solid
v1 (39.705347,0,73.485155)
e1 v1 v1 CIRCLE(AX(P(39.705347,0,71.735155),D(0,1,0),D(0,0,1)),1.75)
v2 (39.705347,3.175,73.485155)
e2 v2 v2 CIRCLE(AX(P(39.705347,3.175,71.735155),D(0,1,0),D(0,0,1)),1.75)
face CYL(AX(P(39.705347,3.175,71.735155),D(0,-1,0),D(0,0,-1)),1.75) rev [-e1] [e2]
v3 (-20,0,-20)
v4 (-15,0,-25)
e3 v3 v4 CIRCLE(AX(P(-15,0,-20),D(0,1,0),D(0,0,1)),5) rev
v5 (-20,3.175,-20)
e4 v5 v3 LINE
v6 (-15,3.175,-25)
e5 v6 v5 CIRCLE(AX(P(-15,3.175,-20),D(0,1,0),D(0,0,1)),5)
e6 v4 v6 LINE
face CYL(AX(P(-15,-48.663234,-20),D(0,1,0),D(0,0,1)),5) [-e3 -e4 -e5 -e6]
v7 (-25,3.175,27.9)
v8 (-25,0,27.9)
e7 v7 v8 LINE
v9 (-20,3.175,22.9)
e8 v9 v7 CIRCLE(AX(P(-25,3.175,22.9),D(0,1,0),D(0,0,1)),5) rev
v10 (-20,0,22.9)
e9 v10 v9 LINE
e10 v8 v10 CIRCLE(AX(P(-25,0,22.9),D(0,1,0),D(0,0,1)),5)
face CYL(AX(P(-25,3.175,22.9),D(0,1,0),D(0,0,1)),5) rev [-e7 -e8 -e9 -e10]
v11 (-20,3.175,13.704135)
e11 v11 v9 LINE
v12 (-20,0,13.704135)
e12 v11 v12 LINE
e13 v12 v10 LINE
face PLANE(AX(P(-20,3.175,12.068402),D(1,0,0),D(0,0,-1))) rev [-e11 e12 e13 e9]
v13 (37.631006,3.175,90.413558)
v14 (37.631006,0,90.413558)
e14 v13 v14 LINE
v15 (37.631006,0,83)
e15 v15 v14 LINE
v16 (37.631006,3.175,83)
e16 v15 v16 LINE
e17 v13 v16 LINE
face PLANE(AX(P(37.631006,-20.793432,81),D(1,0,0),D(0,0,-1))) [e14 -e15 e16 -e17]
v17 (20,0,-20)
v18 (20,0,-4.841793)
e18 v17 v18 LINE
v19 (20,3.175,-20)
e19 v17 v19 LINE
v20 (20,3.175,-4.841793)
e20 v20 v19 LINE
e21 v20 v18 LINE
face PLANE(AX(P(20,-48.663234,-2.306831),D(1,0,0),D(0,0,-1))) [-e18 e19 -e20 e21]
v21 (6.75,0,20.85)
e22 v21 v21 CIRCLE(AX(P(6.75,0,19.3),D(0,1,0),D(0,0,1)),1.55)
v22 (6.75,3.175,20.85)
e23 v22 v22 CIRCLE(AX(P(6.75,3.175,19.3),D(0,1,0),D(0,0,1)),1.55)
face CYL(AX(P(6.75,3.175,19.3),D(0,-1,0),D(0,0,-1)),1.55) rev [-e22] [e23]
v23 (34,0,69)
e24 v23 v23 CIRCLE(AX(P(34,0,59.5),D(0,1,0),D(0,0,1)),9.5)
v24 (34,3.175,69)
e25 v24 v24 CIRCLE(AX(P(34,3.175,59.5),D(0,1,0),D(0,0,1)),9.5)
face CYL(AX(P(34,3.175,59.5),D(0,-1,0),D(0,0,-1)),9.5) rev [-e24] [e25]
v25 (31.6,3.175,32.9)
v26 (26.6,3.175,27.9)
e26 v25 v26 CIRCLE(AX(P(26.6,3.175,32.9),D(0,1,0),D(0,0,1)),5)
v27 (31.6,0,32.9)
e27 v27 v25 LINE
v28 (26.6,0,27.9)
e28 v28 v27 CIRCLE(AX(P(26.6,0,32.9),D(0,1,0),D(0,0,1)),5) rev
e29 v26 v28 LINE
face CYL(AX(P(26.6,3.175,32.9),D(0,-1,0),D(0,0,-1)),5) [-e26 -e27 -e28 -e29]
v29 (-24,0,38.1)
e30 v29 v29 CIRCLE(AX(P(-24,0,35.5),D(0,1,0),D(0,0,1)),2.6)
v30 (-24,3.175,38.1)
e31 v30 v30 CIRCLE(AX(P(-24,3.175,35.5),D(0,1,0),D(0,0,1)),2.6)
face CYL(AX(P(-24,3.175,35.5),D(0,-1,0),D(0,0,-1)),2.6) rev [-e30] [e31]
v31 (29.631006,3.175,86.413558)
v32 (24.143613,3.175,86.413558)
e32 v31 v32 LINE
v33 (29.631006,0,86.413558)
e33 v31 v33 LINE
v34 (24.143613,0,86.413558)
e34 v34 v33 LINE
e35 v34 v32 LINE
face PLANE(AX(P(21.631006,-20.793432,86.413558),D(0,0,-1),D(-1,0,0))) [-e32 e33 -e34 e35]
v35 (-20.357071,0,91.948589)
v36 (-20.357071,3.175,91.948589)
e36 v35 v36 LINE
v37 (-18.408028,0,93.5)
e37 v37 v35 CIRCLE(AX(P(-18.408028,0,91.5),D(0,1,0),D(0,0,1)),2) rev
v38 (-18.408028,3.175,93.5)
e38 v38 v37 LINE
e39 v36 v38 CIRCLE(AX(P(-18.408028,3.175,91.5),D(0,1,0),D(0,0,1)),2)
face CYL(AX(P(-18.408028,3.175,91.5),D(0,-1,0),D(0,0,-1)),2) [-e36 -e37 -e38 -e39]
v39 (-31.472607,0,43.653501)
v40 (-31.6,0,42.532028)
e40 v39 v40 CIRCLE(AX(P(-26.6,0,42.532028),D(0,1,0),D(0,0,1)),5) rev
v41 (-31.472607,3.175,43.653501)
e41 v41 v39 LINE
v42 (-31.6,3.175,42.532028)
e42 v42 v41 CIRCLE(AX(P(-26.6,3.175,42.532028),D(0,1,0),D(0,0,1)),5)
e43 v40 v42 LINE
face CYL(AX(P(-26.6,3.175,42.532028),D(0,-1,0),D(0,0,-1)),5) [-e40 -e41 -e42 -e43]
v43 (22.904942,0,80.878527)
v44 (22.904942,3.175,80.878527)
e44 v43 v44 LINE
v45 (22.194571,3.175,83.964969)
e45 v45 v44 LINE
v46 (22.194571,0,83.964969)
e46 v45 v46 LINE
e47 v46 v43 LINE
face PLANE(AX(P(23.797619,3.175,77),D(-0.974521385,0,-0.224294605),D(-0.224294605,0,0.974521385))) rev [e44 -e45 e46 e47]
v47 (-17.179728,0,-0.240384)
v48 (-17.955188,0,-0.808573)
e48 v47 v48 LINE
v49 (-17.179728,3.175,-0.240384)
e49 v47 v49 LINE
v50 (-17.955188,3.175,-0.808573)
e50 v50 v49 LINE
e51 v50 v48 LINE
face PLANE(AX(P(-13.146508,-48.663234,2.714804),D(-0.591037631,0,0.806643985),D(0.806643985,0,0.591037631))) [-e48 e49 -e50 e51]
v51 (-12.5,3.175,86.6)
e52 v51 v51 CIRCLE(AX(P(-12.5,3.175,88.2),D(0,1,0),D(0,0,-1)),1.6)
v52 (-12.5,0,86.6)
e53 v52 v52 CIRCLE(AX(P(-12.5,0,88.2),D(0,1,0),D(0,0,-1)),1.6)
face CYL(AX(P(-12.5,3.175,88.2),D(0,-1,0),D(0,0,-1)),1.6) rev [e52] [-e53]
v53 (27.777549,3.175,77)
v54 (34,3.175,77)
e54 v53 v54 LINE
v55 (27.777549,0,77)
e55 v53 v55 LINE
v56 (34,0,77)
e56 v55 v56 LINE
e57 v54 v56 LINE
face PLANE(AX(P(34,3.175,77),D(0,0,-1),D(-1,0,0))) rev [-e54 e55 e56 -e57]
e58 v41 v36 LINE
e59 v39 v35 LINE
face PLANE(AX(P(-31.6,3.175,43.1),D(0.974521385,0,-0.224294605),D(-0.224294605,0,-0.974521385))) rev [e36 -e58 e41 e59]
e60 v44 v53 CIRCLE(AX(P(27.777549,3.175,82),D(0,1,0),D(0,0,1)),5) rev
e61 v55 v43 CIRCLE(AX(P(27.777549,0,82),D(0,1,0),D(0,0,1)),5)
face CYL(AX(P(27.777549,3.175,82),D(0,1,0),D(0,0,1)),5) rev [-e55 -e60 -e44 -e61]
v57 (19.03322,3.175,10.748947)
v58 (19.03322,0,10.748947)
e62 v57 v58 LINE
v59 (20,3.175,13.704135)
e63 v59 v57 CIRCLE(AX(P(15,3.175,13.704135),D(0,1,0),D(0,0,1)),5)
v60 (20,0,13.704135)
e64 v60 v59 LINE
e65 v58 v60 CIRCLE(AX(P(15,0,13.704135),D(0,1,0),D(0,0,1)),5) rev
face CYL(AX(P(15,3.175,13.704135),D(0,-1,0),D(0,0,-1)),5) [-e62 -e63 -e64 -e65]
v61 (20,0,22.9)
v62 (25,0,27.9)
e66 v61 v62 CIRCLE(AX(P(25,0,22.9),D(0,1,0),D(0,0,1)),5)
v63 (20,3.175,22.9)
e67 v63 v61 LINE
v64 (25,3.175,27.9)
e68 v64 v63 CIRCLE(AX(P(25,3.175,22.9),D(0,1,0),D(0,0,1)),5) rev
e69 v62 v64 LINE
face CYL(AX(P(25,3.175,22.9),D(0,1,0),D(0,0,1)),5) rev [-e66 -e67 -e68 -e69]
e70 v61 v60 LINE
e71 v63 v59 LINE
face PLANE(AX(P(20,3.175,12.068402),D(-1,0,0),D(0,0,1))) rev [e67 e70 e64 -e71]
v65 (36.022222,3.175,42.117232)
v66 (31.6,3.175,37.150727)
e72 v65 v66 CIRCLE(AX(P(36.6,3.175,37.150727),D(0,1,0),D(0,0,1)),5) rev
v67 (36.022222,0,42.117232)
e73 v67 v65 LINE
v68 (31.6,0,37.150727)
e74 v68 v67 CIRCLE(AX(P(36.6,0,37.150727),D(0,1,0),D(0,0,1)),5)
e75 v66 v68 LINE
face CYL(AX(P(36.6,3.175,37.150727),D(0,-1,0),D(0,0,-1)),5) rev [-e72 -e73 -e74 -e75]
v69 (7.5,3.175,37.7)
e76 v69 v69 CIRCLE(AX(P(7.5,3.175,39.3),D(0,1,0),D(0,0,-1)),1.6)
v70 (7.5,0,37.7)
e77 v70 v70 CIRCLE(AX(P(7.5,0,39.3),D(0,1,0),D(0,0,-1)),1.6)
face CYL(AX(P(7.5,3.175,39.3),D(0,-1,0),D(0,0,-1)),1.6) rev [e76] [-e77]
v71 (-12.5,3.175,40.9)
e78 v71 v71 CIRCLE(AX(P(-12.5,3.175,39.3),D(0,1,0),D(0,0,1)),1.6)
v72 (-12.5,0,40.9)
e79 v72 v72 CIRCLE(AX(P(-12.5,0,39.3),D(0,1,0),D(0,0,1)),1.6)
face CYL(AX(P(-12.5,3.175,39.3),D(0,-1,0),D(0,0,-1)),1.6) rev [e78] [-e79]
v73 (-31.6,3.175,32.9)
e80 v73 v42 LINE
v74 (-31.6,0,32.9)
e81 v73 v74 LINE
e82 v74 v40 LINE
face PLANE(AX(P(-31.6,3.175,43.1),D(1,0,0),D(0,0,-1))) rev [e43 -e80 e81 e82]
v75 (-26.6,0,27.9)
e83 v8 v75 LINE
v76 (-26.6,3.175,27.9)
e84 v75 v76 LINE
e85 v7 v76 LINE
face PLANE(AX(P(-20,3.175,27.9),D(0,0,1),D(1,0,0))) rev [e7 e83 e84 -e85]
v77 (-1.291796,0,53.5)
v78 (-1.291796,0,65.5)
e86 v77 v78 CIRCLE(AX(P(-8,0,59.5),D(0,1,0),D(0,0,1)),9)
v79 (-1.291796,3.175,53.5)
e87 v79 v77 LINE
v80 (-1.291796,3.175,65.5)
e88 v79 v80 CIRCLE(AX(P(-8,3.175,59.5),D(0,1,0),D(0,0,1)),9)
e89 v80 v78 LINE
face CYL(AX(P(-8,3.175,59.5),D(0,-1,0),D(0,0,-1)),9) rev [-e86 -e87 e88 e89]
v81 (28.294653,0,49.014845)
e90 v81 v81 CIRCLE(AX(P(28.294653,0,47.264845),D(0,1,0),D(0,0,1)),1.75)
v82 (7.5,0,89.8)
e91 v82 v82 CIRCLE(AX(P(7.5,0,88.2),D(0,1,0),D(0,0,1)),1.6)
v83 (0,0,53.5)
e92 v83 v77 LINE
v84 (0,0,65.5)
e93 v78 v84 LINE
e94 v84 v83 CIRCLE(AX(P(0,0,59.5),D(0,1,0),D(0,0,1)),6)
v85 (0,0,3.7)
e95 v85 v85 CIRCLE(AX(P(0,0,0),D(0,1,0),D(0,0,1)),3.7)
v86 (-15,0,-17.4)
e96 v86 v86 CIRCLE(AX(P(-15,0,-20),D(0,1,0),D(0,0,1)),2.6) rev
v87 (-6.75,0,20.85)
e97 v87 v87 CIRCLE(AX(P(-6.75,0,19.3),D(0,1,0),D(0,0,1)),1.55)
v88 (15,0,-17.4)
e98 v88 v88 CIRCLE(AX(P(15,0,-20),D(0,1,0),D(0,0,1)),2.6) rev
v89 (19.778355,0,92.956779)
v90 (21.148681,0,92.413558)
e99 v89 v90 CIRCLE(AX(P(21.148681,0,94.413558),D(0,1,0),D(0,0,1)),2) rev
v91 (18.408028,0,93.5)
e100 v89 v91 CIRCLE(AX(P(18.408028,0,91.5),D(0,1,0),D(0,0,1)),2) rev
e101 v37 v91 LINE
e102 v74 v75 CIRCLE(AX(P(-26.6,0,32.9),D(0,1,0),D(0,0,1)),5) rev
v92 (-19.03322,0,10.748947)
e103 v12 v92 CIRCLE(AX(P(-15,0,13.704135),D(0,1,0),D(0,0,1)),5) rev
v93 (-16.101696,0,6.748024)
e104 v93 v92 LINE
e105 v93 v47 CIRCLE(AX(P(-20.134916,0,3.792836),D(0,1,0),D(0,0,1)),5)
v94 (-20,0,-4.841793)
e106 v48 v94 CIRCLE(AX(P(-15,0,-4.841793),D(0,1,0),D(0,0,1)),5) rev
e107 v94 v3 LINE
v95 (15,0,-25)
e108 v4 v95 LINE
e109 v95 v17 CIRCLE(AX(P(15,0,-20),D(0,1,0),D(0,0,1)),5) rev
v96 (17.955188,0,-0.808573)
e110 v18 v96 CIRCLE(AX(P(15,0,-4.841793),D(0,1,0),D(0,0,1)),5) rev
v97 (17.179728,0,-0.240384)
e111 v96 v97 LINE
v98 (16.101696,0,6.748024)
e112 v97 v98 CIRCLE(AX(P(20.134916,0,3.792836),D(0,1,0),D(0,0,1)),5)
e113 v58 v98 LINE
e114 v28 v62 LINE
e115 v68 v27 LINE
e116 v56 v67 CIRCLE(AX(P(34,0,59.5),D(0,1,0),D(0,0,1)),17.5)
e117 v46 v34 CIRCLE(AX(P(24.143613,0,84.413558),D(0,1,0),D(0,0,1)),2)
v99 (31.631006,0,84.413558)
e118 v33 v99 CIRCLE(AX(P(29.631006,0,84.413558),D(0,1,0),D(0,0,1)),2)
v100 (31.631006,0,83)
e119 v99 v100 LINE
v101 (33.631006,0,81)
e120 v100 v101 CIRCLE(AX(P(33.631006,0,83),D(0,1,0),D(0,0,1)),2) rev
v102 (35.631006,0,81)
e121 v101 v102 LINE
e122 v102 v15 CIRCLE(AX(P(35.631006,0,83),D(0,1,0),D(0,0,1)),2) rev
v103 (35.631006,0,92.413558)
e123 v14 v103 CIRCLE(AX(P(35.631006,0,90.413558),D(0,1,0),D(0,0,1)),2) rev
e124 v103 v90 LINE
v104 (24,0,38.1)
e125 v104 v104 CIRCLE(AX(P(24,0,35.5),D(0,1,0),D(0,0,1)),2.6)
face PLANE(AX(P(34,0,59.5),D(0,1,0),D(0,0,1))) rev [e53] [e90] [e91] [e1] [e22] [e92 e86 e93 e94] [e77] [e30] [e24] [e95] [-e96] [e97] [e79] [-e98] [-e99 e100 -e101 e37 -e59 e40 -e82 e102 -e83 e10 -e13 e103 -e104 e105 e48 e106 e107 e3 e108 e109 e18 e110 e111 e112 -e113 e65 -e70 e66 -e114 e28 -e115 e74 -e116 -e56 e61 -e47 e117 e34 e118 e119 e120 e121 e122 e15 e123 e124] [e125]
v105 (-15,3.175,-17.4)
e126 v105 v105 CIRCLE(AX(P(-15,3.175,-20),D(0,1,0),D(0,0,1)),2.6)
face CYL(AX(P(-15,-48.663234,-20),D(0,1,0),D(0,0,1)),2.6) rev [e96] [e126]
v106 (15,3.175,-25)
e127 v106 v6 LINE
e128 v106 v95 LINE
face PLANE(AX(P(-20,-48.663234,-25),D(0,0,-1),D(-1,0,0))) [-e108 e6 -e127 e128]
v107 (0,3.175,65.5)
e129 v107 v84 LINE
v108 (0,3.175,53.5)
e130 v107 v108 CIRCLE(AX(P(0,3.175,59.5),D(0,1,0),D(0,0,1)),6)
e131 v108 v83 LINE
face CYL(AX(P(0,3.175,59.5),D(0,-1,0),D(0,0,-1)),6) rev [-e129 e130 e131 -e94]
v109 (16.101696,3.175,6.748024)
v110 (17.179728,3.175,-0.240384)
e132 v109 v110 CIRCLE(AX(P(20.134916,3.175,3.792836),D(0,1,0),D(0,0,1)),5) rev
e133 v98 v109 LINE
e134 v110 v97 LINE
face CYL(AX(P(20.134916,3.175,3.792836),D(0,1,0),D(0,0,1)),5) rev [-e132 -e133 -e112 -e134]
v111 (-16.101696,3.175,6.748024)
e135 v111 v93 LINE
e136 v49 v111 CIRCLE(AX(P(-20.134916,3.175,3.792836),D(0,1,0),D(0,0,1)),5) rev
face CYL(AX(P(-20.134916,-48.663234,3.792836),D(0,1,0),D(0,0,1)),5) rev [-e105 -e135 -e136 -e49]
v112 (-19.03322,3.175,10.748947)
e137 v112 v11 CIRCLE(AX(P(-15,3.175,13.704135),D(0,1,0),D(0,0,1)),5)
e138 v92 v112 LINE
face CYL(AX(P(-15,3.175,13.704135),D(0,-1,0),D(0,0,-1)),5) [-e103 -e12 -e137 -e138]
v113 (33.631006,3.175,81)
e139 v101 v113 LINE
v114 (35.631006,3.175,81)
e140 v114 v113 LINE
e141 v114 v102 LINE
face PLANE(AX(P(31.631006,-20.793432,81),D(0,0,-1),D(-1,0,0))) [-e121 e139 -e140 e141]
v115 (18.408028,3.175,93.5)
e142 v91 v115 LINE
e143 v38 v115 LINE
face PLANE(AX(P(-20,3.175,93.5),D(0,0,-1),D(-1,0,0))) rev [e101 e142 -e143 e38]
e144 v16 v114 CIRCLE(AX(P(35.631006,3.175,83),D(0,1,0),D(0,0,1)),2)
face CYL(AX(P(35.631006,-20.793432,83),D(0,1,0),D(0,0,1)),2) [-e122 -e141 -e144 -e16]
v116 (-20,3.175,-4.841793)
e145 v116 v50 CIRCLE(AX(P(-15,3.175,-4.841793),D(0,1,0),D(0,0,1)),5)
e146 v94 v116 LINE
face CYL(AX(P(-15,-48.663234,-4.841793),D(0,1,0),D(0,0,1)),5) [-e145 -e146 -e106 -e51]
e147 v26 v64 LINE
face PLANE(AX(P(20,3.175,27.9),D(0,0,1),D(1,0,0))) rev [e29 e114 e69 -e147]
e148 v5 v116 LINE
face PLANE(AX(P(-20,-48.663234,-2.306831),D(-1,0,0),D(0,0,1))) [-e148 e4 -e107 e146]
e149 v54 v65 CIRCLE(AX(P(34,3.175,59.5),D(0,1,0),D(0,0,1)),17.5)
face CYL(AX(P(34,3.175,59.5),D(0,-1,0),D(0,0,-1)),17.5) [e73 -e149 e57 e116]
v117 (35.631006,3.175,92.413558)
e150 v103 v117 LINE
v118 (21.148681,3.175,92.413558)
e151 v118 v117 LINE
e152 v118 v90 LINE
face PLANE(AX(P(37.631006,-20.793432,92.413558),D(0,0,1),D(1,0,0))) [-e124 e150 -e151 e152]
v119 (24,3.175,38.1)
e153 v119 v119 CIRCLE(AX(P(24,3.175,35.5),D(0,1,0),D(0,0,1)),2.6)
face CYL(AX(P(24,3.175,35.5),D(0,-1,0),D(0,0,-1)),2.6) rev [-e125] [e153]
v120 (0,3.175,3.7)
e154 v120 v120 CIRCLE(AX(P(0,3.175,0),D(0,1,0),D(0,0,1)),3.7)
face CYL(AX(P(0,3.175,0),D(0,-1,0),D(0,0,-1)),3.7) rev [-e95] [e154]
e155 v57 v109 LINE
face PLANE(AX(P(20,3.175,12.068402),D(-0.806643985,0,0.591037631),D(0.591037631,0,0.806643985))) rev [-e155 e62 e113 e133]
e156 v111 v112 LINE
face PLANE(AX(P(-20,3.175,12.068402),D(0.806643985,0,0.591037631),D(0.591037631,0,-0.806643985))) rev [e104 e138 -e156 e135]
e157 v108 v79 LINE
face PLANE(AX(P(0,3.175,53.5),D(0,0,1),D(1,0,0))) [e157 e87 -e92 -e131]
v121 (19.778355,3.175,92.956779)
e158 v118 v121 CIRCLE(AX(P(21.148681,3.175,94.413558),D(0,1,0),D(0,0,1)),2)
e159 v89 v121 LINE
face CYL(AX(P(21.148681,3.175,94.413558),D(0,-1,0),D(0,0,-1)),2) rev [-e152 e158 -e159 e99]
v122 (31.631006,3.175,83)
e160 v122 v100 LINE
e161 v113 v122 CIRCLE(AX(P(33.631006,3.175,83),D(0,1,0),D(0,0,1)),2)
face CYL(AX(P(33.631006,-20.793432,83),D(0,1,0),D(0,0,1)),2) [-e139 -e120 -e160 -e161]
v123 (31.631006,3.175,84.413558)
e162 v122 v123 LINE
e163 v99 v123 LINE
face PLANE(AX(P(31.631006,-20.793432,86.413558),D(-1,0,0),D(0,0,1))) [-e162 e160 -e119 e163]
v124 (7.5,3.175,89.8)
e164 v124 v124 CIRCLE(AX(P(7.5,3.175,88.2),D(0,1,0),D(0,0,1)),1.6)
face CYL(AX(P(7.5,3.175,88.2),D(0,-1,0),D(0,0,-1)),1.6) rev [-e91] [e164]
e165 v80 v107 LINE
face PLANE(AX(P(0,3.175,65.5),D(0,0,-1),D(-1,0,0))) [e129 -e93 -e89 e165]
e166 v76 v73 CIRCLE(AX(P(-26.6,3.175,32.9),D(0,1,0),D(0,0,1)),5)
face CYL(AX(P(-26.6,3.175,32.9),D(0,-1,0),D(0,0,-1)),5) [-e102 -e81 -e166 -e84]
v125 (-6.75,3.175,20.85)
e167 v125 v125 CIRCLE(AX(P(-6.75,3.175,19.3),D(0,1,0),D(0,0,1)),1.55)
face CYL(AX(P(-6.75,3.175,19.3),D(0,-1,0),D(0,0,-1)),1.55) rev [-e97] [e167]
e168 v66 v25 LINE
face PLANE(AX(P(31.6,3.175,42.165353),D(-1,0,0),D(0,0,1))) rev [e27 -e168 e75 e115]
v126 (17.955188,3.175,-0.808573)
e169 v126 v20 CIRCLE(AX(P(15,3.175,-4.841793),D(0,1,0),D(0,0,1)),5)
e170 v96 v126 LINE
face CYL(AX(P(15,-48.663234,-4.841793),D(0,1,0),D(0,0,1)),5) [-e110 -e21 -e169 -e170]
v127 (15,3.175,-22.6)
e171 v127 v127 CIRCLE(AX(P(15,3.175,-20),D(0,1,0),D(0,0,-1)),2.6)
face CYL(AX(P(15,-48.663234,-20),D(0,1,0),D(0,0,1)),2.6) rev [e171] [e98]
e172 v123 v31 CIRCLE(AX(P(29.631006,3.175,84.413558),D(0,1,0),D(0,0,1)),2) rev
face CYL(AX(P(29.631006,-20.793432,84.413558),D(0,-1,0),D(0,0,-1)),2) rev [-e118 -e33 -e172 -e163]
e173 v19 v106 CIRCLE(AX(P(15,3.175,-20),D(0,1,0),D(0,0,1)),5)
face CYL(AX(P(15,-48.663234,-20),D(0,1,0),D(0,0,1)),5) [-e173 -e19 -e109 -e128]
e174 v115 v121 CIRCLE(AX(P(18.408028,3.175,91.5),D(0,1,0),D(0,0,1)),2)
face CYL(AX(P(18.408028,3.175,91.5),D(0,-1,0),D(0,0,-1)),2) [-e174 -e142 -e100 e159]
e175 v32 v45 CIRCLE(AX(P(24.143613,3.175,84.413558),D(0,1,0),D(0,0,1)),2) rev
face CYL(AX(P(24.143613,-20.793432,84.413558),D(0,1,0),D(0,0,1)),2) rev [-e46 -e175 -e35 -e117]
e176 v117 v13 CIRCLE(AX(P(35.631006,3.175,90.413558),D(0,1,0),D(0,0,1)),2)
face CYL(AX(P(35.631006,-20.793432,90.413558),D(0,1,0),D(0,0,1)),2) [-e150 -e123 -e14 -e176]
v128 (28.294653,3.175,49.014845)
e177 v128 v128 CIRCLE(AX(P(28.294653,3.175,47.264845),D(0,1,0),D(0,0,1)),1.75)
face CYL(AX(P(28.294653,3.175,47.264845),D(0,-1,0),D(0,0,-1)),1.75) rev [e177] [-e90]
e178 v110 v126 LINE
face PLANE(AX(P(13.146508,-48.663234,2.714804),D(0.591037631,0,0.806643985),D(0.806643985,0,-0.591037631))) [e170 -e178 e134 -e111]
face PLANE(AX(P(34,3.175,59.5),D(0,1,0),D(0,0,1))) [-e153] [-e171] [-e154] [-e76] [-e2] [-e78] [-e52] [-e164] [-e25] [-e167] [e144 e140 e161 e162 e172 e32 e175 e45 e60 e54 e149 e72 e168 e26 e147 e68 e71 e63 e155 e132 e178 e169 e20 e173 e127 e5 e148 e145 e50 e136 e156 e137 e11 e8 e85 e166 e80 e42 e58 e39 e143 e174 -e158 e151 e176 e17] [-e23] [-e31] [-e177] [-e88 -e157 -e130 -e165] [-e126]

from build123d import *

# Parameters (mm, degrees)
SKETCH1_R           = 9.5
SKETCH1_R_2         = 1.75
SKETCH1_R_3         = 2.6
SKETCH1_R_4         = 3.7
SKETCH1_R_5         = 1.6
SKETCH1_R_6         = 1.55
BOSS_EXTRUDE1_DEPTH = 3.175
FILLET1_R           = 5
FILLET2_R           = 2
BOSS_EXTRUDE2_DEPTH = 3.175
FILLET3_R           = 2
FILLET4_R           = 2
BOSS_EXTRUDE3_START = -3.175
SKETCH4_R           = 2.6
BOSS_EXTRUDE3_DEPTH = 3.175
FILLET5_R           = 5


with BuildPart() as part:
    # Sketch1 → Boss-Extrude1 (new body)
    with BuildSketch(Plane(origin=(0, 0, 0), x_dir=(1, 0, 0), z_dir=(0, 1, 0))):
        with BuildLine():
            Line((-20, -12.068401935), (-7.259795863, 5.319338683))
            ThreePointArc((-7.259795863, 5.319338683), (0, 9), (7.259795863, 5.319338683))
            Line((7.259795863, 5.319338683), (20, -12.068401935))
            Line((20, -12.068401935), (20, -27.9))
            Line((20, -27.9), (31.6, -27.9))
            Line((31.6, -27.9), (31.6, -42.165352614))
            ThreePointArc((31.6, -42.165352614), (51.458612907, -58.2971553), (34, -77))
            Line((34, -77), (23.797619048, -77))
            Line((23.797619048, -77), (20, -93.5))
            Line((20, -93.5), (-20, -93.5))
            Line((-20, -93.5), (-31.6, -43.1))
            Line((-31.6, -43.1), (-31.6, -27.9))
            Line((-31.6, -27.9), (-20, -27.9))
            Line((-20, -27.9), (-20, -12.068401935))
        make_face()
        with Locations(Location((34, -59.5, 0), (0, 0, 270))):
            Circle(SKETCH1_R, mode=Mode.SUBTRACT)
        with Locations(Location((28.294653467, -47.264844875, 0), (0, 0, 270))):
            Circle(SKETCH1_R_2, mode=Mode.SUBTRACT)
        with Locations(Location((39.705346533, -71.735155125, 0), (0, 0, 270))):
            Circle(SKETCH1_R_2, mode=Mode.SUBTRACT)
        with Locations(Location((-24, -35.5, 0), (0, 0, 270))):
            Circle(SKETCH1_R_3, mode=Mode.SUBTRACT)
        with Locations(Location((24, -35.5, 0), (0, 0, 270))):
            Circle(SKETCH1_R_3, mode=Mode.SUBTRACT)
        with Locations(Location((0, 0, 0), (0, 0, 270))):
            Circle(SKETCH1_R_4, mode=Mode.SUBTRACT)
        with Locations(Location((-12.5, -39.3, 0), (0, 0, 270))):
            Circle(SKETCH1_R_5, mode=Mode.SUBTRACT)
        with Locations(Location((-6.75, -19.3, 0), (0, 0, 270))):
            Circle(SKETCH1_R_6, mode=Mode.SUBTRACT)
        with Locations(Location((6.75, -19.3, 0), (0, 0, 270))):
            Circle(SKETCH1_R_6, mode=Mode.SUBTRACT)
        with Locations(Location((7.5, -39.3, 0), (0, 0, 90))):
            Circle(SKETCH1_R_5, mode=Mode.SUBTRACT)
        with Locations(Location((7.5, -88.2, 0), (0, 0, 270))):
            Circle(SKETCH1_R_5, mode=Mode.SUBTRACT)
        with Locations(Location((-12.5, -88.2, 0), (0, 0, 90))):
            Circle(SKETCH1_R_5, mode=Mode.SUBTRACT)
        with BuildLine():
            Line((0, -53.5), (-1.291796068, -53.5))
            ThreePointArc((-1.291796068, -53.5), (-17, -59.5), (-1.291796068, -65.5))
            Line((-1.291796068, -65.5), (0, -65.5))
            ThreePointArc((0, -65.5), (6, -59.5), (0, -53.5))
        make_face(mode=Mode.SUBTRACT)
    extrude(amount=BOSS_EXTRUDE1_DEPTH)

    # Fillet1
    fillet1_edges = [part.edges().sort_by_distance(p)[0] for p in [
        (-31.6, 1.5875, 43.1),
        (-31.6, 1.5875, 27.9),
        (-20, 1.5875, 27.9),
        (-20, 1.5875, 12.068401935),
        (20, 1.5875, 12.068401935),
        (20, 1.5875, 27.9),
        (31.6, 1.5875, 27.9),
        (31.6, 1.5875, 42.165352614),
        (23.797619048, 1.5875, 77),
    ]]
    fillet(fillet1_edges, radius=FILLET1_R)

    # Fillet2
    fillet2_edges = [part.edges().sort_by_distance(p)[0] for p in [
        (-20, 1.5875, 93.5),
        (20, 1.5875, 93.5),
    ]]
    fillet(fillet2_edges, radius=FILLET2_R)

    # Sketch3 → Boss-Extrude2 (add)
    with BuildSketch(Plane(origin=(0, 3.175, 0), x_dir=(1, 0, 0), z_dir=(0, 1, 0))):
        Polygon((21.631006471, -86.413558093), (31.631006471, -86.413558093), (31.631006471, -81), (37.631006471, -81), (37.631006471, -92.413558093), (20.25005409, -92.413558093), align=None)
    extrude(amount=-BOSS_EXTRUDE2_DEPTH)

    # Fillet3
    fillet3_edges = [part.edges().sort_by_distance(p)[0] for p in [
        (21.631006471, 1.5875, 86.413558093),
        (31.631006471, 1.5875, 86.413558093),
        (31.631006471, 1.5875, 81),
        (37.631006471, 1.5875, 81),
        (37.631006471, 1.5875, 92.413558093),
    ]]
    fillet(fillet3_edges, radius=FILLET3_R)

    # Fillet4
    # the kernel refuses this fillet: 2 mm, written as the material it adds along each edge
    with BuildSketch(Plane(origin=(20.357070738, 0, 91.948589209), x_dir=(-0.22429460454884337, 0, 0.974521385281143), z_dir=(0, 1, 0))) as fillet4_piece_1:
        with BuildLine():
            CenterArc((1.551860901, 1.686696047), FILLET4_R, 237.495369906, 9.676681216)
            ThreePointArc((0.77593045, -0.156651976), (0.395792845, -0.039554126), (0, 0))
            Line((0, 0), (0.477125378, 0))
        make_face()
    extrude(amount=3.175)
    # the kernel refuses this fillet: 2 mm, written as the material it adds along each edge
    with BuildSketch(Plane(origin=(20.25005409, 3.175, 92.413558093), x_dir=(1, 0, 0), z_dir=(0, -1, 0))) as fillet4_2_piece_1:
        with BuildLine():
            CenterArc((0.898626945, 2), FILLET4_R, 226.75155148, 43.24844852)
            Line((-0.471699589, 0.543220953), (-0.608732242, 0.397543049))
            ThreePointArc((-0.608732242, 0.397543049), (-0.381915572, 0.139094357), (-0.140266399, -0.142566957))
            Line((-0.140266399, -0.142566957), (0, -0.2))
            Line((0, -0.2), (0.898626945, -0.2))
            Line((0.898626945, -0.2), (0.898626945, 0))
        make_face()
    extrude(amount=3.175)

    # Sketch4 → Boss-Extrude3 (add)
    with BuildSketch(Plane(origin=(0, 3.175, 0), x_dir=(1, 0, 0), z_dir=(0, 1, 0)).offset(BOSS_EXTRUDE3_START)):
        with BuildLine():
            Line((13.146507893, -2.714804316), (7.259795863, 5.319338683))
            ThreePointArc((7.259795863, 5.319338683), (0, 9), (-7.259795863, 5.319338683))
            Line((-7.259795863, 5.319338683), (-13.146507893, -2.714804316))
            Line((-13.146507893, -2.714804316), (-20, 2.306830778))
            Line((-20, 2.306830778), (-20, 25))
            Line((-20, 25), (20, 25))
            Line((20, 25), (20, 2.306830778))
            Line((20, 2.306830778), (13.146507893, -2.714804316))
        make_face()
        with Locations(Location((-15, 20, 0), (0, 0, 270))):
            Circle(SKETCH4_R, mode=Mode.SUBTRACT)
        with Locations(Location((15, 20, 0), (0, 0, 270))):
            Circle(SKETCH4_R, mode=Mode.SUBTRACT)
    extrude(amount=BOSS_EXTRUDE3_DEPTH)

    # Fillet5
    fillet5_edges = [part.edges().sort_by_distance(p)[0] for p in [
        (13.146507893, 1.5875, 2.714804316),
        (20, 1.5875, -2.306830778),
        (20, 1.5875, -25),
        (-20, 1.5875, -25),
        (-20, 1.5875, -2.306830778),
        (-13.146507893, 1.5875, 2.714804316),
    ]]
    fillet(fillet5_edges, radius=FILLET5_R)


solid = part.part
